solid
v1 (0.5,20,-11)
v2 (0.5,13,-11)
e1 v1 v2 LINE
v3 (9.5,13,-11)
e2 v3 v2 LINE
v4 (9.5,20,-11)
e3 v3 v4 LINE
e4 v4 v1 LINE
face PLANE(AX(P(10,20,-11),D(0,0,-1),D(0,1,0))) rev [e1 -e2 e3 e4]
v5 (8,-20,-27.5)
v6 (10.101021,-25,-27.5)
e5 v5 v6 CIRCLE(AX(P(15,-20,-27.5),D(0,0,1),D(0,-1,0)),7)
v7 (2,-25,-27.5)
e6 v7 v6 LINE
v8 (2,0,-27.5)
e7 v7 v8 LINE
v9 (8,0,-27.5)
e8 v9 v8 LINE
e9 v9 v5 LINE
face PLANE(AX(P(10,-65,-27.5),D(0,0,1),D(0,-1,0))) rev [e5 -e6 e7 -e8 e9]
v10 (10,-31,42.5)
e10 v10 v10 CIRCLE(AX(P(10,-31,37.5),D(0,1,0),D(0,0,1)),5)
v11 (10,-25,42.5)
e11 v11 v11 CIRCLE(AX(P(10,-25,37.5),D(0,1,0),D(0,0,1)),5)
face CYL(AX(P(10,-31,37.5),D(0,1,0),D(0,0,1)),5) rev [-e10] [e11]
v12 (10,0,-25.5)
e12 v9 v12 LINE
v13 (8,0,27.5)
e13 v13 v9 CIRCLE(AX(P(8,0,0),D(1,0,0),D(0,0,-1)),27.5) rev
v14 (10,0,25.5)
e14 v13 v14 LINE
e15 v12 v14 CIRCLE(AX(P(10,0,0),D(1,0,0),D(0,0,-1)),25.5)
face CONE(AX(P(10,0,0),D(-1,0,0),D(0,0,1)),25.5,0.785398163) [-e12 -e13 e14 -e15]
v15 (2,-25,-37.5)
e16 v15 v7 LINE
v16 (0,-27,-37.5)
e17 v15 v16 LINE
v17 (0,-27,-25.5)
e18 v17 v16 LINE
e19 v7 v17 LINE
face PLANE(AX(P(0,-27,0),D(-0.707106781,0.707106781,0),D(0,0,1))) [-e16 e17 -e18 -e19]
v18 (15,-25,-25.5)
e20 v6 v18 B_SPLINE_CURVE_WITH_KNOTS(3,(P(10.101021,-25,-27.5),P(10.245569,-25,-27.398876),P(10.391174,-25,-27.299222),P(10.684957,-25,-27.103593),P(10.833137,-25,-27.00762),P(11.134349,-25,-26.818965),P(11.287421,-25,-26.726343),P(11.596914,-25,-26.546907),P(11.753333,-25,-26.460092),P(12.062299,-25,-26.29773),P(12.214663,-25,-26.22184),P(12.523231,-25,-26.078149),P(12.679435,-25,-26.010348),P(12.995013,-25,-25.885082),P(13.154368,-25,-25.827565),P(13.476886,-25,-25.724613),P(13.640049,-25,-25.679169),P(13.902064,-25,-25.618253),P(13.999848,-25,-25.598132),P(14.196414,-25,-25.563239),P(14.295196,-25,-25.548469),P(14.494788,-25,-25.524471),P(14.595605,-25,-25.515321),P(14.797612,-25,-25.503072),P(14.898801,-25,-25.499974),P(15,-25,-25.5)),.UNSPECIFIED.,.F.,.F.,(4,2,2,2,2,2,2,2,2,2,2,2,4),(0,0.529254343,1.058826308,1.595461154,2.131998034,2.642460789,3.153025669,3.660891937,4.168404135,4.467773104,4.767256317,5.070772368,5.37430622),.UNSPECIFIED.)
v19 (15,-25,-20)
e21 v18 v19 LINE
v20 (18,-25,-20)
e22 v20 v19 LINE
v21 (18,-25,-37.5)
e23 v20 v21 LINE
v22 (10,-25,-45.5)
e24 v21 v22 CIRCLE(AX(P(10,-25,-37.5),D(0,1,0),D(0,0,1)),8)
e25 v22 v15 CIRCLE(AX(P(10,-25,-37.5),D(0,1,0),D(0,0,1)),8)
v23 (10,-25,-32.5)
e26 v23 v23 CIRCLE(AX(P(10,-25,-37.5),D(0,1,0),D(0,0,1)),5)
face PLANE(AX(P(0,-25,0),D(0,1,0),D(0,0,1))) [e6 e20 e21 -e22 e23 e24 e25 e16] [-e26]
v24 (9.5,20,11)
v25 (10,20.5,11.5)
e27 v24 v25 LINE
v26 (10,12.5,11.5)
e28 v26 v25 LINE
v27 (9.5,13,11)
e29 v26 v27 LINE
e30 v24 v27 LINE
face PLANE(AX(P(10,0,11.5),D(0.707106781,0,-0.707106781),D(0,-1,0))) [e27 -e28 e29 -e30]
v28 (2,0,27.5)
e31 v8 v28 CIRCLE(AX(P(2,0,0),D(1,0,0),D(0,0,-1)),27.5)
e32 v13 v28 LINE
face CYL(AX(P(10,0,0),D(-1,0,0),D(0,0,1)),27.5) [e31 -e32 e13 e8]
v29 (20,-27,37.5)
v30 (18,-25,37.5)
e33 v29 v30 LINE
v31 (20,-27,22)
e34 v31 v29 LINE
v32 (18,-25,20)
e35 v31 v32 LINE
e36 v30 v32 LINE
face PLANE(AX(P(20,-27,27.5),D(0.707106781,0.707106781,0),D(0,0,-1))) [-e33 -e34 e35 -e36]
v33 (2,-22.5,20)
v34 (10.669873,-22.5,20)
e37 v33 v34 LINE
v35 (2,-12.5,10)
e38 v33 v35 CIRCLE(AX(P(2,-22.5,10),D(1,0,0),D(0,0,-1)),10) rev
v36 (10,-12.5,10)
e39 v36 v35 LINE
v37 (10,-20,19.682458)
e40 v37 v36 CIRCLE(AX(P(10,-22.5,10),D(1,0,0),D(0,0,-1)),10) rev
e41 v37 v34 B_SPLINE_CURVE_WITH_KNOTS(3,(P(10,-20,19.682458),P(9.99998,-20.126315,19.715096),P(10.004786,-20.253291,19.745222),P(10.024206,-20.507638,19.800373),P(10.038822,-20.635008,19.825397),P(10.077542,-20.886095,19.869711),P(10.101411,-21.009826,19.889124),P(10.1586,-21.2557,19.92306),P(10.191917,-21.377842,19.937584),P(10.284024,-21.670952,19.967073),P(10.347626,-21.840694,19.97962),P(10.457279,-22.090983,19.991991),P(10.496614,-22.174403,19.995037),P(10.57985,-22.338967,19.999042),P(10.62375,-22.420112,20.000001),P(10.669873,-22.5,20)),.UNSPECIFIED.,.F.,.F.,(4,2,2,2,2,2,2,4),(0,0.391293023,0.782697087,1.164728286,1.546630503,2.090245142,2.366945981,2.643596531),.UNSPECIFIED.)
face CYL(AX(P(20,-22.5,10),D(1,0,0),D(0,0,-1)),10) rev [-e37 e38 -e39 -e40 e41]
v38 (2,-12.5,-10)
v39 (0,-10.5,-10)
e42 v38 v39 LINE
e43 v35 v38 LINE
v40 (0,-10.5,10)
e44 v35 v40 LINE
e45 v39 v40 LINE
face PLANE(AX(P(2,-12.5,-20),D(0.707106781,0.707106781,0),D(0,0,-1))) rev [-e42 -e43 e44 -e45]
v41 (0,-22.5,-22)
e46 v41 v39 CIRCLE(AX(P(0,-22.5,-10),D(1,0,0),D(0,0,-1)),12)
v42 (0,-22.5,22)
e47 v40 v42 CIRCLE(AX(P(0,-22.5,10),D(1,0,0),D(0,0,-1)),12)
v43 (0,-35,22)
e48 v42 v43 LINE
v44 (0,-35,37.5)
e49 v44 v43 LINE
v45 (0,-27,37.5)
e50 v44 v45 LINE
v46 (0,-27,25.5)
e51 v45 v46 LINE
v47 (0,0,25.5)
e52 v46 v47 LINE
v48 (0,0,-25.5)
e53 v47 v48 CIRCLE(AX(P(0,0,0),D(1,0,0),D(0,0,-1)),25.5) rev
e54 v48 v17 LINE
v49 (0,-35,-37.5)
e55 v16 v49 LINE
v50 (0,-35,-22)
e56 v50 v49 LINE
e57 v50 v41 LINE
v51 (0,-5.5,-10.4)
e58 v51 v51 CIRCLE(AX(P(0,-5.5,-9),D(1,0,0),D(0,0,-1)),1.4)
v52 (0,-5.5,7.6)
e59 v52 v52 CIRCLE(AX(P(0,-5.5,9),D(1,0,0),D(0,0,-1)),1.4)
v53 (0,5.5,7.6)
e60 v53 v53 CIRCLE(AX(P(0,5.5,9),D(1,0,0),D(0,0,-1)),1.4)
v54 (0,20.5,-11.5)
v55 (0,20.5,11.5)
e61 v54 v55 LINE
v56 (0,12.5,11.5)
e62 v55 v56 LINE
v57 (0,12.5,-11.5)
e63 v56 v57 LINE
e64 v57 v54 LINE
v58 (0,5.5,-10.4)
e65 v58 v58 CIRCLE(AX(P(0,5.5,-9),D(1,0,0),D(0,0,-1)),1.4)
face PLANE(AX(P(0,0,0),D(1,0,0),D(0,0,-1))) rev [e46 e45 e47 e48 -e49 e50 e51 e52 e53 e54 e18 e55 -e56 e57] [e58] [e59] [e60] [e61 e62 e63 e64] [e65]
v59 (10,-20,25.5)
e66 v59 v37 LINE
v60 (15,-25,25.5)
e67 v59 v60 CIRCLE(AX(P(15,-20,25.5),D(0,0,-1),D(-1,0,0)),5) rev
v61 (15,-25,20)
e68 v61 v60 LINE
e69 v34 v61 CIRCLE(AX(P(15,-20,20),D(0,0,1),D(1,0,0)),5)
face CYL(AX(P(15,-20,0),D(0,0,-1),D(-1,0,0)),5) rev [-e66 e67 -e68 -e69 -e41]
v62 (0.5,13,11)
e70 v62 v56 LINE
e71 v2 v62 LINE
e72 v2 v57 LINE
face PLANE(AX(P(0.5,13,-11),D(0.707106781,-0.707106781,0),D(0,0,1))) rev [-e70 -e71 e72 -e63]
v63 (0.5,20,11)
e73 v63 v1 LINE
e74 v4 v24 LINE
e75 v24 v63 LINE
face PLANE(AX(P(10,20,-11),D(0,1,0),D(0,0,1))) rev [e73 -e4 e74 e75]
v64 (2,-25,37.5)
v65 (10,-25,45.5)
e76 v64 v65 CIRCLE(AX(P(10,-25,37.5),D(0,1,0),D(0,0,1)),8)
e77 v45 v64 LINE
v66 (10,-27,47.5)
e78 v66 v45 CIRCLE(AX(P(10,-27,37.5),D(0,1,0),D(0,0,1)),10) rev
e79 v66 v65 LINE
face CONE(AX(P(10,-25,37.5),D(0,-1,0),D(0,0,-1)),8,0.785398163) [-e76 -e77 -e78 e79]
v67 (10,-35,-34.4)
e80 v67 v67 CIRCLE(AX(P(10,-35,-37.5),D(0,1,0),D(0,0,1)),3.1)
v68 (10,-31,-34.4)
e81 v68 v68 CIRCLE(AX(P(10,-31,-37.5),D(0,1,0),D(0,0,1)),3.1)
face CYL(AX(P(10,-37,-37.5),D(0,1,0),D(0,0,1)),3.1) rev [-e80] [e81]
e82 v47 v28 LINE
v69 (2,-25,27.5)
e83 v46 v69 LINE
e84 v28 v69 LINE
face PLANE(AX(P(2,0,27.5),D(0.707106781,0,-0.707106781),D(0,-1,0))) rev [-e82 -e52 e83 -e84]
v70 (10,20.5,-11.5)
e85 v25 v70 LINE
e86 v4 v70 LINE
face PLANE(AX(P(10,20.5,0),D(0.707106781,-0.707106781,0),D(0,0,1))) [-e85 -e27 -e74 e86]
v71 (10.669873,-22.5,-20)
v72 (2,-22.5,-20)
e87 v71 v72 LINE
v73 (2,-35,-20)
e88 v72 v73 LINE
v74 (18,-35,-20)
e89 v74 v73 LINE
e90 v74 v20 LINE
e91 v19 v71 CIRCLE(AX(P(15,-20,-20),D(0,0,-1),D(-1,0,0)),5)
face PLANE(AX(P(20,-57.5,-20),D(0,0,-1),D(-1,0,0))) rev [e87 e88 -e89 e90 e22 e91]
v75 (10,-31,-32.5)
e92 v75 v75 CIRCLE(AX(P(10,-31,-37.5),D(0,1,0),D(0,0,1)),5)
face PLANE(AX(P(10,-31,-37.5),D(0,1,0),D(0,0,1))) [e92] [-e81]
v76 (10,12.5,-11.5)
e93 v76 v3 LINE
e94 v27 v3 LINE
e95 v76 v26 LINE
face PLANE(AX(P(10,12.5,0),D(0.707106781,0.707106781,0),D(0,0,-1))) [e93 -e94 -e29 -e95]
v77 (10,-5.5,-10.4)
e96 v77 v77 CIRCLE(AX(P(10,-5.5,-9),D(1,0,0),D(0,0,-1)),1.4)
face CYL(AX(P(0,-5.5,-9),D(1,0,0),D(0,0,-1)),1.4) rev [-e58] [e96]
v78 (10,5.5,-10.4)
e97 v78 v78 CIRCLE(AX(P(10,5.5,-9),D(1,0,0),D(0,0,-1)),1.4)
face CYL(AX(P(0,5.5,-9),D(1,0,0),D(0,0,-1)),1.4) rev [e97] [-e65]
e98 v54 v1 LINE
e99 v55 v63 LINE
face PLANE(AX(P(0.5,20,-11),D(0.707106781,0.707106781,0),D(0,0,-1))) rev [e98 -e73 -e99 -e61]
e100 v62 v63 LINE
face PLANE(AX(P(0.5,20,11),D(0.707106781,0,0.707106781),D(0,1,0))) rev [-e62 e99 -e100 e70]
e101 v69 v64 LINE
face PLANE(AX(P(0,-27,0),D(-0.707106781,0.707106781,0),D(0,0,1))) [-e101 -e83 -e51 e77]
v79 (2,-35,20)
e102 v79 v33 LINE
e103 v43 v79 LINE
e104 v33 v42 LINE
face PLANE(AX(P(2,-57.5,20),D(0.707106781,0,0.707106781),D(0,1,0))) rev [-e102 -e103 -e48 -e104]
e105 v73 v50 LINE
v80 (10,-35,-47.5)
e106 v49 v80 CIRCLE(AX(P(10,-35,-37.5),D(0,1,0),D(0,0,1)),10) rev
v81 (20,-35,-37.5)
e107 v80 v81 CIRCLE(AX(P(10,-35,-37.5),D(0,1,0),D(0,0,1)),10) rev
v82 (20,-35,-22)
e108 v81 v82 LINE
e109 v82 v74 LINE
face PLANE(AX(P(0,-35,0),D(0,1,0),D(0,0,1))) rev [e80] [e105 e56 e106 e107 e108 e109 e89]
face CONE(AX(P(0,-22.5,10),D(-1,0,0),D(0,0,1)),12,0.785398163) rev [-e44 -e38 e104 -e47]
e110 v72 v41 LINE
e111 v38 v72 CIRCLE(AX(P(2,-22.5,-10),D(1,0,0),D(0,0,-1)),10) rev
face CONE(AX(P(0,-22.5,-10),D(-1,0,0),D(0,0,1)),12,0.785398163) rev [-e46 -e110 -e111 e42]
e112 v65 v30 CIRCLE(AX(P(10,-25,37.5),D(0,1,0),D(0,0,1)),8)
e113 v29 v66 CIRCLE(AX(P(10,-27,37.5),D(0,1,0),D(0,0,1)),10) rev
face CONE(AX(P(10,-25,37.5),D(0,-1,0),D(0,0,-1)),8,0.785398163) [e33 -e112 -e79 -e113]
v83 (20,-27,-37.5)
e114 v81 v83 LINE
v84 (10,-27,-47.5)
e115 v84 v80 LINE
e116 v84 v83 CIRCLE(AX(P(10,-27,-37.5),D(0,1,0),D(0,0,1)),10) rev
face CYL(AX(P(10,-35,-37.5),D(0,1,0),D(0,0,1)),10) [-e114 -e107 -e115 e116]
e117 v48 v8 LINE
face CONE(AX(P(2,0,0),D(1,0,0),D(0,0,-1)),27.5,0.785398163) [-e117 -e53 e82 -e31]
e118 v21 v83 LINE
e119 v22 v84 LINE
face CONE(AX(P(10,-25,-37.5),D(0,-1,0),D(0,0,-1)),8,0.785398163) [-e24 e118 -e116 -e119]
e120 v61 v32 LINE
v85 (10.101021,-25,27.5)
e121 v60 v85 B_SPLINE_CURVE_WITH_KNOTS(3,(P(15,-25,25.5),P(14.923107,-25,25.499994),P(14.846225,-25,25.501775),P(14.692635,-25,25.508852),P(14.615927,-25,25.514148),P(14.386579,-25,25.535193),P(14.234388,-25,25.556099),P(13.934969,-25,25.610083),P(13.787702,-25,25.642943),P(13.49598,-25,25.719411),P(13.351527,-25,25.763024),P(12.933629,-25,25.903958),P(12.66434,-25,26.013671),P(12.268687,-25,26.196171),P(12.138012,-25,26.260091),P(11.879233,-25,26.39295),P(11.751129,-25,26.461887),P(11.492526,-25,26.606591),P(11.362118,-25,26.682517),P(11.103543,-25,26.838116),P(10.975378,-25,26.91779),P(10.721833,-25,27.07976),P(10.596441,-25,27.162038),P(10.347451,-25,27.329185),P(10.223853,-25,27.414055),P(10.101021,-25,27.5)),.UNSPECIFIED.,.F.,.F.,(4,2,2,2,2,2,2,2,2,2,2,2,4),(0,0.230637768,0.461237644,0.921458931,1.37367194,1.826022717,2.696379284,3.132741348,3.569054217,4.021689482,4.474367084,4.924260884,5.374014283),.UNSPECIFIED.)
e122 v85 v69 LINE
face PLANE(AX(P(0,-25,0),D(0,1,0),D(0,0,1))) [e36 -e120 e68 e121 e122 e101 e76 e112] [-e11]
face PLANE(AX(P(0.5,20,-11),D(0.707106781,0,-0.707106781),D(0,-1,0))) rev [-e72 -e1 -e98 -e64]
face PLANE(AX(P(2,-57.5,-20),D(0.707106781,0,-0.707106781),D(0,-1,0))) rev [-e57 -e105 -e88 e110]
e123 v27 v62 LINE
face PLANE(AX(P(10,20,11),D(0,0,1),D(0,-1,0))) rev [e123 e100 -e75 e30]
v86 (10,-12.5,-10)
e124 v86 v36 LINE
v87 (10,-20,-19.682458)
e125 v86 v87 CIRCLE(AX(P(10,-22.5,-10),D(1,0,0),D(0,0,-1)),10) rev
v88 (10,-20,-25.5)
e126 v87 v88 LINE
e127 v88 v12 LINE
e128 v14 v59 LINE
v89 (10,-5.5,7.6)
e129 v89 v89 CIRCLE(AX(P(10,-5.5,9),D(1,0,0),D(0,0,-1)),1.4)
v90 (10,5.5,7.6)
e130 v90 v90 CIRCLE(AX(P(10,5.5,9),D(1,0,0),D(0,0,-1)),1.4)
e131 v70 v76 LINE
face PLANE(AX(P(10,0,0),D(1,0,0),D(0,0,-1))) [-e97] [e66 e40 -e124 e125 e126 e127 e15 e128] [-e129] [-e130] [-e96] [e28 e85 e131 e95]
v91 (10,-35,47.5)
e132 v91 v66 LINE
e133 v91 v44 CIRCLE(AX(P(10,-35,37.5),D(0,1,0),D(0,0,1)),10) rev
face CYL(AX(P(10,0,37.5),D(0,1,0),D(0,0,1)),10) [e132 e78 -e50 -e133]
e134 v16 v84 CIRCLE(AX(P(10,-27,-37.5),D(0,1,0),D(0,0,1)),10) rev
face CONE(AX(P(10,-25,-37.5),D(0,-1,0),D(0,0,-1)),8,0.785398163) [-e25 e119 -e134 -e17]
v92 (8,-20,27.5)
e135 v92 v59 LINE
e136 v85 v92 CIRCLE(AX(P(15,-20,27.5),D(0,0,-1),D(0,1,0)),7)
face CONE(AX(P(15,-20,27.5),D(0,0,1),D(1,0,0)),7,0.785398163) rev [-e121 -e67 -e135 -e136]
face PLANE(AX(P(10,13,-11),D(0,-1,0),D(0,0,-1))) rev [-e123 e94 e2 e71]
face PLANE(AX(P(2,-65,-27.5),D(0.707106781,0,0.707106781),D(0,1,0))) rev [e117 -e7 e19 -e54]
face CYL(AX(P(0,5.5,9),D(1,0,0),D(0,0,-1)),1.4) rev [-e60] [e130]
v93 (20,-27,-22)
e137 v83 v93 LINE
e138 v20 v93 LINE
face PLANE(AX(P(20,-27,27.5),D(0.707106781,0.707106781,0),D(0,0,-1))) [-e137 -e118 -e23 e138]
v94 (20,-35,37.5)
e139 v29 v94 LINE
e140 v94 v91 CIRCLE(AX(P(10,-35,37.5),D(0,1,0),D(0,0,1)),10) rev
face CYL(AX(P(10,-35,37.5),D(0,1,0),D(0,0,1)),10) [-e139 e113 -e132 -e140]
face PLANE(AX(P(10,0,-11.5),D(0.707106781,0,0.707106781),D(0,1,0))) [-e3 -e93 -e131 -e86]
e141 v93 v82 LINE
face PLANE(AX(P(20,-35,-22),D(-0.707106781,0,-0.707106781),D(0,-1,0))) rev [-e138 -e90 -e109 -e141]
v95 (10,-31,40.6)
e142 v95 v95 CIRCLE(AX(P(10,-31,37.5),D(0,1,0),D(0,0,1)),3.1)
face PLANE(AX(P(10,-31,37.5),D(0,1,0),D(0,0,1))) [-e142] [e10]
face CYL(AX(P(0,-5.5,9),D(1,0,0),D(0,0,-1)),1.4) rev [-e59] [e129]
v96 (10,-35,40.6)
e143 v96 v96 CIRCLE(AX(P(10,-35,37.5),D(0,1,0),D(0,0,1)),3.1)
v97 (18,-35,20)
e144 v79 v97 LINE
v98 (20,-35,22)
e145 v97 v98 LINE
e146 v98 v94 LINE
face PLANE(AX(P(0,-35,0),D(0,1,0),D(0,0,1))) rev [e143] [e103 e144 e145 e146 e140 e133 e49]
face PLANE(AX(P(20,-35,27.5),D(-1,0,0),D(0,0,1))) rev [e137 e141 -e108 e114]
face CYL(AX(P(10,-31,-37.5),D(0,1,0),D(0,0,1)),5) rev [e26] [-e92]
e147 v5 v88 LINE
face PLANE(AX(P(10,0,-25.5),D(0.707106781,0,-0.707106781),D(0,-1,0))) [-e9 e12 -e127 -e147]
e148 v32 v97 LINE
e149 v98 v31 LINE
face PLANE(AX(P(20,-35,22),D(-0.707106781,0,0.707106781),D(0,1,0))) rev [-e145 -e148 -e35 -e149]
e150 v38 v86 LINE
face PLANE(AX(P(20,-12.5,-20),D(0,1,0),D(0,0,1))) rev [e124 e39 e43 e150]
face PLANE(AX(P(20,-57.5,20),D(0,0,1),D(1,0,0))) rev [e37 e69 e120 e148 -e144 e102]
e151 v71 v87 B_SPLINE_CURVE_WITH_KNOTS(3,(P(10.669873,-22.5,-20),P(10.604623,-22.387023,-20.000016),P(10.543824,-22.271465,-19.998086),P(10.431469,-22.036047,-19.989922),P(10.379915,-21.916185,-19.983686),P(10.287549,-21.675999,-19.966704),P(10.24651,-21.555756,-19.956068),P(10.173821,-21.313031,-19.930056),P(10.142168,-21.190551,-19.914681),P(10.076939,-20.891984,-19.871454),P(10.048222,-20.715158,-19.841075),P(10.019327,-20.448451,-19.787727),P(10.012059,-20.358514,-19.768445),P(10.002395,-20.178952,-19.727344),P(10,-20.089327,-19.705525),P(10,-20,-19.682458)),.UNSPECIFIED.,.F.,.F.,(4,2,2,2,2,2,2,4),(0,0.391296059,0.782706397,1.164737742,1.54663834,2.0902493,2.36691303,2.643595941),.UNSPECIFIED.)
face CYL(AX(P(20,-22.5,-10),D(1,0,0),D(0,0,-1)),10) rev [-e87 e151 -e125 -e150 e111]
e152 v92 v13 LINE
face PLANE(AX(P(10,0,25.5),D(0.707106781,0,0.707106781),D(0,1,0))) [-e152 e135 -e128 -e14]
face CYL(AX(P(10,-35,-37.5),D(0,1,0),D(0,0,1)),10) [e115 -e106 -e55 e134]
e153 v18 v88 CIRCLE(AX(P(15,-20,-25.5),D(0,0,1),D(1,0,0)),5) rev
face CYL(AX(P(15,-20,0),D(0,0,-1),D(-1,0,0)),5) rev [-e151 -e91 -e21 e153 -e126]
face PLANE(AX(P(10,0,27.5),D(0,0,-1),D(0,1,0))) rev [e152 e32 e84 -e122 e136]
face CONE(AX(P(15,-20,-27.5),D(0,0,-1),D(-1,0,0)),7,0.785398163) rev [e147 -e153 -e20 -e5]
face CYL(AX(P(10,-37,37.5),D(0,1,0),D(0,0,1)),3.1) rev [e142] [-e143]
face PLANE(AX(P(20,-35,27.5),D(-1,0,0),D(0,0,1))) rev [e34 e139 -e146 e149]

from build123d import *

# Parameters (mm, degrees)
EXTRUDE_1_DEPTH     = 10
SKETCH_2_R          = 1.4
CUT_EXTRUDE_1_DEPTH = 72.282887147
SKETCH_4_W          = 22
SKETCH_4_H          = 7
CUT_EXTRUDE_4_DEPTH = 10
CHAMFER_2_SIZE      = 0.5
SKETCH_5_W          = 10
SKETCH_5_H          = 55
CUT_EXTRUDE_5_DEPTH = 40
EXTRUDE_2_DEPTH     = 10
FILLET_1_R          = 10
SKETCH_7_R          = 5
CUT_EXTRUDE_6_DEPTH = 6
SKETCH_8_R          = 3.1
CUT_EXTRUDE_7_DEPTH = 6
SKETCH_9_W          = 40
SKETCH_9_H          = 45
CUT_EXTRUDE_8_DEPTH = 63.299678972
FILLET_2_R          = 10
FILLET_3_R          = 5
CHAMFER_3_SIZE      = 2


# Some blends are built 0.0001 mm under size
with BuildPart() as part:
    # 草图1 → 凸台-拉伸1 (new body)
    with BuildSketch(Plane(origin=(0, 0, 0), x_dir=(0, 0, -1), z_dir=(1, 0, 0))):
        with BuildLine():
            Line((-27.5, 0), (-27.5, -65))
            Line((-27.5, -65), (27.5, -65))
            Line((27.5, -65), (27.5, 0))
            ThreePointArc((27.5, 0), (0, 27.5), (-27.5, 0))
        make_face()
    extrude(amount=EXTRUDE_1_DEPTH)

    # 草图2 → 切除-拉伸1 (cut, through all)
    with BuildSketch(Plane(origin=(10, 0, 0), x_dir=(0, 0, -1), z_dir=(1, 0, 0))):
        with Locations((-9, 5.5)):
            Circle(SKETCH_2_R)
        with Locations((9, 5.5)):
            Circle(SKETCH_2_R)
        with Locations((9, -5.5)):
            Circle(SKETCH_2_R)
        with Locations((-9, -5.5)):
            Circle(SKETCH_2_R)
    extrude(amount=-CUT_EXTRUDE_1_DEPTH, mode=Mode.SUBTRACT)

    # 草图4 → 切除-拉伸4 (cut)
    with BuildSketch(Plane.ZY):
        with Locations((0, 16.5)):
            Rectangle(SKETCH_4_W, SKETCH_4_H)
    extrude(amount=-CUT_EXTRUDE_4_DEPTH, mode=Mode.SUBTRACT)

    # 倒角2
    chamfer_2_edges = [part.edges().sort_by_distance(p)[0] for p in [
        (10, 16.5, -11),
        (10, 20, 0),
        (10, 16.5, 11),
        (10, 13, 0),
        (0, 16.5, -11),
        (0, 13, 0),
        (0, 16.5, 11),
        (0, 20, 0),
    ]]
    chamfer(chamfer_2_edges, length=CHAMFER_2_SIZE)

    # 草图5 → 切除-拉伸5 (cut)
    with BuildSketch(Plane(origin=(0, -65, 0), x_dir=(-1, 0, 0), z_dir=(0, -1, 0))):
        with Locations((-5, 0)):
            Rectangle(SKETCH_5_W, SKETCH_5_H)
    extrude(amount=-CUT_EXTRUDE_5_DEPTH, mode=Mode.SUBTRACT)

    # 草图6 → 凸台-拉伸2 (add)
    with BuildSketch(Plane(origin=(0, -25, 0), x_dir=(-1, 0, 0), z_dir=(0, -1, 0))):
        Polygon((0, -27.5), (0, 27.5), (0, 47.5), (-20, 47.5), (-20, 27.5), (-20, -27.5), (-20, -47.5), (0, -47.5), align=None)
    extrude(amount=EXTRUDE_2_DEPTH)

    # 圆角1
    fillet_1_edges = [part.edges().sort_by_distance(p)[0] for p in [
        (0, -30, -47.5),
        (20, -30, -47.5),
        (0, -30, 47.5),
        (20, -30, 47.5),
    ]]
    fillet(fillet_1_edges, radius=FILLET_1_R - 0.0001)  # a hair under: the kernel refuses the full size

    # 草图7 → 切除-拉伸6 (cut)
    with BuildSketch(Plane(origin=(0, -25, 0), x_dir=(1, 0, 0), z_dir=(0, 1, 0))):
        with Locations(Location((10, 37.5, 0), (0, 0, 270))):
            Circle(SKETCH_7_R)
        with Locations(Location((10, -37.5, 0), (0, 0, 270))):
            Circle(SKETCH_7_R)
    extrude(amount=-CUT_EXTRUDE_6_DEPTH, mode=Mode.SUBTRACT)

    # 草图8 → 切除-拉伸7 (cut)
    with BuildSketch(Plane(origin=(0, -31, 0), x_dir=(1, 0, 0), z_dir=(0, 1, 0))):
        with Locations(Location((10, 37.5, 0), (0, 0, 270))):
            Circle(SKETCH_8_R)
        with Locations(Location((10, -37.5, 0), (0, 0, 270))):
            Circle(SKETCH_8_R)
    extrude(amount=-CUT_EXTRUDE_7_DEPTH, mode=Mode.SUBTRACT)

    # 草图9 → 切除-拉伸8 (cut, through all)
    with BuildSketch(Plane.ZY):
        with Locations((0, -35)):
            Rectangle(SKETCH_9_W, SKETCH_9_H)
    extrude(amount=-CUT_EXTRUDE_8_DEPTH, mode=Mode.SUBTRACT)

    # 圆角2
    fillet_2_edges = [part.edges().sort_by_distance(p)[0] for p in [
        (5, -12.5, 20),
        (5, -12.5, -20),
    ]]
    fillet(fillet_2_edges, radius=FILLET_2_R)

    # 圆角3
    fillet_3_edges = [part.edges().sort_by_distance(p)[0] for p in [
        (10, -25, -23.75),
        (10, -25, 23.75),
    ]]
    fillet(fillet_3_edges, radius=FILLET_3_R)

    # 倒角3
    # the kernel refuses this chamfer: 2 mm, written as the material it takes off along each edge
    with BuildSketch(Plane(origin=(0, -25, 37.5001), x_dir=(1, 0, 0), z_dir=(0, 0, -1)), Plane(origin=(0, -25, -27.5), x_dir=(1, 0, 0), z_dir=(0, 0, -1))) as chamfer_3_piece_1:
        Polygon((CHAMFER_3_SIZE, 0), (0, CHAMFER_3_SIZE), (0, 0), align=None)
    extrude(amount=10.0001, mode=Mode.SUBTRACT)
    with BuildSketch(Plane(origin=(20, -25, -37.5001), x_dir=(0, -1, 0), z_dir=(0, 0, 1))) as chamfer_3_piece_2:
        Polygon((CHAMFER_3_SIZE, 0), (0, -CHAMFER_3_SIZE), (0, 0), align=None)
    extrude(amount=22.643465976, mode=Mode.SUBTRACT)
    with BuildSketch(Plane(origin=(10.0001, -25, 37.5001), x_dir=(0, 0, 1), z_dir=(-1, 0, 0))) as chamfer_3_piece_3:
        Polygon((9.9999 - CHAMFER_3_SIZE, 0), (9.9999, -CHAMFER_3_SIZE), (9.9999, 0), align=None)
    revolve(axis=Axis((10.0001, -25, 37.5001), (0, 1, 0)), revolution_arc=90, mode=Mode.SUBTRACT)
    with BuildSketch(Plane(origin=(9.9999, -25, 37.5001), x_dir=(-1, 0, 0), z_dir=(0, 0, -1))) as chamfer_3_piece_4:
        Polygon((9.9999 - CHAMFER_3_SIZE, 0), (9.9999, -CHAMFER_3_SIZE), (9.9999, 0), align=None)
    revolve(axis=Axis((9.9999, -25, 37.5001), (0, 1, 0)), revolution_arc=90, mode=Mode.SUBTRACT)
    with BuildSketch(Plane(origin=(10.0001, -25, -37.5001), x_dir=(0, 0, -1), z_dir=(-1, 0, 0))) as chamfer_3_piece_5:
        Polygon((9.9999, CHAMFER_3_SIZE), (9.9999 - CHAMFER_3_SIZE, 0), (9.9999, 0), align=None)
    revolve(axis=Axis((10.0001, -25, -37.5001), (0, -1, 0)), revolution_arc=90, mode=Mode.SUBTRACT)
    with BuildSketch(Plane(origin=(9.9999, -25, -37.5001), x_dir=(-1, 0, 0), z_dir=(0, 0, 1))) as chamfer_3_piece_6:
        Polygon((9.9999, CHAMFER_3_SIZE), (9.9999 - CHAMFER_3_SIZE, 0), (9.9999, 0), align=None)
    revolve(axis=Axis((9.9999, -25, -37.5001), (0, -1, 0)), revolution_arc=90, mode=Mode.SUBTRACT)
    with BuildSketch(Plane(origin=(20, -25, 14.856634024), x_dir=(-1, 0, 0), z_dir=(0, 0, 1))) as chamfer_3_piece_7:
        Polygon((CHAMFER_3_SIZE, 0), (0, CHAMFER_3_SIZE), (0, 0), align=None)
    extrude(amount=22.643465976, mode=Mode.SUBTRACT)
    with BuildSketch(Plane(origin=(0, -40.143365976, 20), x_dir=(1, 0, 0), z_dir=(0, 1, 0)), Plane(origin=(0, -22.5, -20), x_dir=(1, 0, 0), z_dir=(0, -1, 0))) as chamfer_3_piece_8:
        Polygon((CHAMFER_3_SIZE, 0), (0, -CHAMFER_3_SIZE), (0, 0), align=None)
    extrude(amount=17.643365976, mode=Mode.SUBTRACT)
    with BuildSketch(Plane(origin=(20, -40.143365976, 20), x_dir=(0, 0, 1), z_dir=(0, 1, 0))) as chamfer_3_piece_9:
        Polygon((CHAMFER_3_SIZE, 0), (0, -CHAMFER_3_SIZE), (0, 0), align=None)
    extrude(amount=20.286731952, mode=Mode.SUBTRACT)
    with BuildSketch(Plane(origin=(20, -19.856634024, -20), x_dir=(-1, 0, 0), z_dir=(0, -1, 0))) as chamfer_3_piece_10:
        Polygon((CHAMFER_3_SIZE, 0), (0, CHAMFER_3_SIZE), (0, 0), align=None)
    extrude(amount=20.286731952, mode=Mode.SUBTRACT)
    with BuildSketch(Plane(origin=(0, -12.5, 10), x_dir=(1, 0, 0), z_dir=(0, 0, -1))) as chamfer_3_piece_11:
        Polygon((CHAMFER_3_SIZE, 0), (0, -CHAMFER_3_SIZE), (0, 0), align=None)
    extrude(amount=20, mode=Mode.SUBTRACT)
    with BuildSketch(Plane(origin=(0, -22.5, -10), x_dir=(0, 0, -1), z_dir=(0, -1, 0))) as chamfer_3_piece_12:
        Polygon((10 + CHAMFER_3_SIZE, 0), (10, CHAMFER_3_SIZE), (10, 0), align=None)
    revolve(axis=Axis((0, -22.5, -10), (1, 0, 0)), revolution_arc=90, mode=Mode.SUBTRACT)
    with BuildSketch(Plane(origin=(0, -22.5, 10), x_dir=(0, 1, 0), z_dir=(0, 0, -1))) as chamfer_3_piece_13:
        Polygon((10, CHAMFER_3_SIZE), (10 + CHAMFER_3_SIZE, 0), (10, 0), align=None)
    revolve(axis=Axis((0, -22.5, 10), (1, 0, 0)), revolution_arc=90, mode=Mode.SUBTRACT)
    with BuildSketch(Plane(origin=(10, -20, -27.5), x_dir=(-1, 0, 0), z_dir=(0, 1, 0)), Plane(origin=(10, 0, 27.5), x_dir=(-1, 0, 0), z_dir=(0, -1, 0))) as chamfer_3_piece_14:
        Polygon((CHAMFER_3_SIZE, 0), (0, CHAMFER_3_SIZE), (0, 0), align=None)
    extrude(amount=20, mode=Mode.SUBTRACT)
    with BuildSketch(Plane(origin=(15, -20, -27.5), x_dir=(0.8568283041143762, -0.5156018398614208, 0), z_dir=(0.5156018398614208, 0.8568283041143762, 0))) as chamfer_3_piece_15_section:
        Polygon((5 + CHAMFER_3_SIZE, 0), (5, -CHAMFER_3_SIZE), (5, 0), align=None)
    chamfer_3_piece_15 = revolve(axis=Axis((15, -20, -27.5), (0, 0, -1)), revolution_arc=148.962308712, mode=Mode.PRIVATE)
    chamfer_3_piece_15 = split(chamfer_3_piece_15, bisect_by=Plane(origin=(15, -25, -27.5), z_dir=(0, 1, 0)), keep=Keep.TOP, mode=Mode.PRIVATE)
    add(chamfer_3_piece_15, mode=Mode.SUBTRACT)
    with BuildSketch(Plane(origin=(15, -20, 27.5), x_dir=(0.8568283041143756, -0.5156018398614214, 0), z_dir=(0.5156018398614214, 0.8568283041143756, 0))) as chamfer_3_piece_16_section:
        Polygon((5 + CHAMFER_3_SIZE, 0), (5, CHAMFER_3_SIZE), (5, 0), align=None)
    chamfer_3_piece_16 = revolve(axis=Axis((15, -20, 27.5), (0, 0, -1)), revolution_arc=148.962308712, mode=Mode.PRIVATE)
    chamfer_3_piece_16 = split(chamfer_3_piece_16, bisect_by=Plane(origin=(15, -25, 27.5), z_dir=(0, 1, 0)), keep=Keep.TOP, mode=Mode.PRIVATE)
    add(chamfer_3_piece_16, mode=Mode.SUBTRACT)
    with BuildSketch(Plane(origin=(10, 0, 0), x_dir=(0, 0, -1), z_dir=(0, -1, 0))) as chamfer_3_piece_17:
        Polygon((27.5, -CHAMFER_3_SIZE), (27.5 - CHAMFER_3_SIZE, 0), (27.5, 0), align=None)
    revolve(axis=Axis((10, 0, 0), (1, 0, 0)), revolution_arc=180, mode=Mode.SUBTRACT)
    with BuildSketch(Plane(origin=(0, 0, 27.5), x_dir=(1, 0, 0), z_dir=(0, -1, 0)), Plane(origin=(0, -25, -27.5), x_dir=(1, 0, 0), z_dir=(0, 1, 0))) as chamfer_3_piece_18:
        Polygon((CHAMFER_3_SIZE, 0), (0, -CHAMFER_3_SIZE), (0, 0), align=None)
    extrude(amount=25, mode=Mode.SUBTRACT)
    with BuildSketch(Plane(origin=(0, 0, 0), x_dir=(0, 0, -1), z_dir=(0, -1, 0))) as chamfer_3_piece_19:
        Polygon((27.5, CHAMFER_3_SIZE), (27.5 - CHAMFER_3_SIZE, 0), (27.5, 0), align=None)
    revolve(axis=Axis((0, 0, 0), (1, 0, 0)), revolution_arc=180, mode=Mode.SUBTRACT)
    with BuildSketch(Plane(origin=(9.9999, -25, -47.5), x_dir=(0, -1, 0), z_dir=(1, 0, 0))) as chamfer_3_piece_20:
        Polygon((CHAMFER_3_SIZE, 0), (0, -CHAMFER_3_SIZE), (0, 0), align=None)
    extrude(amount=0.0002, mode=Mode.SUBTRACT)
    with BuildSketch(Plane(origin=(10.0001, -25, 47.5), x_dir=(0, 0, -1), z_dir=(-1, 0, 0))) as chamfer_3_piece_21:
        Polygon((CHAMFER_3_SIZE, 0), (0, CHAMFER_3_SIZE), (0, 0), align=None)
    extrude(amount=0.0002, mode=Mode.SUBTRACT)
    with BuildSketch(Plane(origin=(0, 0, 27.5), x_dir=(1, 0, 0), z_dir=(0, -1, 0))) as chamfer_3_piece_22a_section:
        Polygon((CHAMFER_3_SIZE, 0), (0, -CHAMFER_3_SIZE), (0, 0), align=None)
    chamfer_3_piece_22a = extrude(amount=30.143365976, mode=Mode.PRIVATE)
    chamfer_3_piece_22a = split(chamfer_3_piece_22a, bisect_by=Plane(origin=(0, -25, 27.5), z_dir=(0, -1, 0)), keep=Keep.TOP, mode=Mode.PRIVATE)
    with BuildSketch(Plane(origin=(0, -25, 37.5001), x_dir=(1, 0, 0), z_dir=(0, 0, -1))) as chamfer_3_piece_22b_section:
        Polygon((CHAMFER_3_SIZE, 0), (0, CHAMFER_3_SIZE), (0, 0), align=None)
    chamfer_3_piece_22b = extrude(amount=15.143465976, mode=Mode.PRIVATE)
    chamfer_3_piece_22b = split(chamfer_3_piece_22b, bisect_by=Plane(origin=(0, -25, 27.5), z_dir=(0, 0, -1)), keep=Keep.TOP, mode=Mode.PRIVATE)
    chamfer_3_piece_22 = chamfer_3_piece_22a & chamfer_3_piece_22b
    add(chamfer_3_piece_22, mode=Mode.SUBTRACT)
    with BuildSketch(Plane(origin=(0, -25, -22.356634024), x_dir=(1, 0, 0), z_dir=(0, 0, -1))) as chamfer_3_piece_23a_section:
        Polygon((CHAMFER_3_SIZE, 0), (0, CHAMFER_3_SIZE), (0, 0), align=None)
    chamfer_3_piece_23a = extrude(amount=15.143465976, mode=Mode.PRIVATE)
    chamfer_3_piece_23a = split(chamfer_3_piece_23a, bisect_by=Plane(origin=(0, -25, -27.5), z_dir=(0, 0, 1)), keep=Keep.TOP, mode=Mode.PRIVATE)
    with BuildSketch(Plane(origin=(0, -30.143365976, -27.5), x_dir=(1, 0, 0), z_dir=(0, 1, 0))) as chamfer_3_piece_23b_section:
        Polygon((CHAMFER_3_SIZE, 0), (0, -CHAMFER_3_SIZE), (0, 0), align=None)
    chamfer_3_piece_23b = extrude(amount=30.143365976, mode=Mode.PRIVATE)
    chamfer_3_piece_23b = split(chamfer_3_piece_23b, bisect_by=Plane(origin=(0, -25, -27.5), z_dir=(0, -1, 0)), keep=Keep.TOP, mode=Mode.PRIVATE)
    chamfer_3_piece_23 = chamfer_3_piece_23a & chamfer_3_piece_23b
    add(chamfer_3_piece_23, mode=Mode.SUBTRACT)


solid = part.part
